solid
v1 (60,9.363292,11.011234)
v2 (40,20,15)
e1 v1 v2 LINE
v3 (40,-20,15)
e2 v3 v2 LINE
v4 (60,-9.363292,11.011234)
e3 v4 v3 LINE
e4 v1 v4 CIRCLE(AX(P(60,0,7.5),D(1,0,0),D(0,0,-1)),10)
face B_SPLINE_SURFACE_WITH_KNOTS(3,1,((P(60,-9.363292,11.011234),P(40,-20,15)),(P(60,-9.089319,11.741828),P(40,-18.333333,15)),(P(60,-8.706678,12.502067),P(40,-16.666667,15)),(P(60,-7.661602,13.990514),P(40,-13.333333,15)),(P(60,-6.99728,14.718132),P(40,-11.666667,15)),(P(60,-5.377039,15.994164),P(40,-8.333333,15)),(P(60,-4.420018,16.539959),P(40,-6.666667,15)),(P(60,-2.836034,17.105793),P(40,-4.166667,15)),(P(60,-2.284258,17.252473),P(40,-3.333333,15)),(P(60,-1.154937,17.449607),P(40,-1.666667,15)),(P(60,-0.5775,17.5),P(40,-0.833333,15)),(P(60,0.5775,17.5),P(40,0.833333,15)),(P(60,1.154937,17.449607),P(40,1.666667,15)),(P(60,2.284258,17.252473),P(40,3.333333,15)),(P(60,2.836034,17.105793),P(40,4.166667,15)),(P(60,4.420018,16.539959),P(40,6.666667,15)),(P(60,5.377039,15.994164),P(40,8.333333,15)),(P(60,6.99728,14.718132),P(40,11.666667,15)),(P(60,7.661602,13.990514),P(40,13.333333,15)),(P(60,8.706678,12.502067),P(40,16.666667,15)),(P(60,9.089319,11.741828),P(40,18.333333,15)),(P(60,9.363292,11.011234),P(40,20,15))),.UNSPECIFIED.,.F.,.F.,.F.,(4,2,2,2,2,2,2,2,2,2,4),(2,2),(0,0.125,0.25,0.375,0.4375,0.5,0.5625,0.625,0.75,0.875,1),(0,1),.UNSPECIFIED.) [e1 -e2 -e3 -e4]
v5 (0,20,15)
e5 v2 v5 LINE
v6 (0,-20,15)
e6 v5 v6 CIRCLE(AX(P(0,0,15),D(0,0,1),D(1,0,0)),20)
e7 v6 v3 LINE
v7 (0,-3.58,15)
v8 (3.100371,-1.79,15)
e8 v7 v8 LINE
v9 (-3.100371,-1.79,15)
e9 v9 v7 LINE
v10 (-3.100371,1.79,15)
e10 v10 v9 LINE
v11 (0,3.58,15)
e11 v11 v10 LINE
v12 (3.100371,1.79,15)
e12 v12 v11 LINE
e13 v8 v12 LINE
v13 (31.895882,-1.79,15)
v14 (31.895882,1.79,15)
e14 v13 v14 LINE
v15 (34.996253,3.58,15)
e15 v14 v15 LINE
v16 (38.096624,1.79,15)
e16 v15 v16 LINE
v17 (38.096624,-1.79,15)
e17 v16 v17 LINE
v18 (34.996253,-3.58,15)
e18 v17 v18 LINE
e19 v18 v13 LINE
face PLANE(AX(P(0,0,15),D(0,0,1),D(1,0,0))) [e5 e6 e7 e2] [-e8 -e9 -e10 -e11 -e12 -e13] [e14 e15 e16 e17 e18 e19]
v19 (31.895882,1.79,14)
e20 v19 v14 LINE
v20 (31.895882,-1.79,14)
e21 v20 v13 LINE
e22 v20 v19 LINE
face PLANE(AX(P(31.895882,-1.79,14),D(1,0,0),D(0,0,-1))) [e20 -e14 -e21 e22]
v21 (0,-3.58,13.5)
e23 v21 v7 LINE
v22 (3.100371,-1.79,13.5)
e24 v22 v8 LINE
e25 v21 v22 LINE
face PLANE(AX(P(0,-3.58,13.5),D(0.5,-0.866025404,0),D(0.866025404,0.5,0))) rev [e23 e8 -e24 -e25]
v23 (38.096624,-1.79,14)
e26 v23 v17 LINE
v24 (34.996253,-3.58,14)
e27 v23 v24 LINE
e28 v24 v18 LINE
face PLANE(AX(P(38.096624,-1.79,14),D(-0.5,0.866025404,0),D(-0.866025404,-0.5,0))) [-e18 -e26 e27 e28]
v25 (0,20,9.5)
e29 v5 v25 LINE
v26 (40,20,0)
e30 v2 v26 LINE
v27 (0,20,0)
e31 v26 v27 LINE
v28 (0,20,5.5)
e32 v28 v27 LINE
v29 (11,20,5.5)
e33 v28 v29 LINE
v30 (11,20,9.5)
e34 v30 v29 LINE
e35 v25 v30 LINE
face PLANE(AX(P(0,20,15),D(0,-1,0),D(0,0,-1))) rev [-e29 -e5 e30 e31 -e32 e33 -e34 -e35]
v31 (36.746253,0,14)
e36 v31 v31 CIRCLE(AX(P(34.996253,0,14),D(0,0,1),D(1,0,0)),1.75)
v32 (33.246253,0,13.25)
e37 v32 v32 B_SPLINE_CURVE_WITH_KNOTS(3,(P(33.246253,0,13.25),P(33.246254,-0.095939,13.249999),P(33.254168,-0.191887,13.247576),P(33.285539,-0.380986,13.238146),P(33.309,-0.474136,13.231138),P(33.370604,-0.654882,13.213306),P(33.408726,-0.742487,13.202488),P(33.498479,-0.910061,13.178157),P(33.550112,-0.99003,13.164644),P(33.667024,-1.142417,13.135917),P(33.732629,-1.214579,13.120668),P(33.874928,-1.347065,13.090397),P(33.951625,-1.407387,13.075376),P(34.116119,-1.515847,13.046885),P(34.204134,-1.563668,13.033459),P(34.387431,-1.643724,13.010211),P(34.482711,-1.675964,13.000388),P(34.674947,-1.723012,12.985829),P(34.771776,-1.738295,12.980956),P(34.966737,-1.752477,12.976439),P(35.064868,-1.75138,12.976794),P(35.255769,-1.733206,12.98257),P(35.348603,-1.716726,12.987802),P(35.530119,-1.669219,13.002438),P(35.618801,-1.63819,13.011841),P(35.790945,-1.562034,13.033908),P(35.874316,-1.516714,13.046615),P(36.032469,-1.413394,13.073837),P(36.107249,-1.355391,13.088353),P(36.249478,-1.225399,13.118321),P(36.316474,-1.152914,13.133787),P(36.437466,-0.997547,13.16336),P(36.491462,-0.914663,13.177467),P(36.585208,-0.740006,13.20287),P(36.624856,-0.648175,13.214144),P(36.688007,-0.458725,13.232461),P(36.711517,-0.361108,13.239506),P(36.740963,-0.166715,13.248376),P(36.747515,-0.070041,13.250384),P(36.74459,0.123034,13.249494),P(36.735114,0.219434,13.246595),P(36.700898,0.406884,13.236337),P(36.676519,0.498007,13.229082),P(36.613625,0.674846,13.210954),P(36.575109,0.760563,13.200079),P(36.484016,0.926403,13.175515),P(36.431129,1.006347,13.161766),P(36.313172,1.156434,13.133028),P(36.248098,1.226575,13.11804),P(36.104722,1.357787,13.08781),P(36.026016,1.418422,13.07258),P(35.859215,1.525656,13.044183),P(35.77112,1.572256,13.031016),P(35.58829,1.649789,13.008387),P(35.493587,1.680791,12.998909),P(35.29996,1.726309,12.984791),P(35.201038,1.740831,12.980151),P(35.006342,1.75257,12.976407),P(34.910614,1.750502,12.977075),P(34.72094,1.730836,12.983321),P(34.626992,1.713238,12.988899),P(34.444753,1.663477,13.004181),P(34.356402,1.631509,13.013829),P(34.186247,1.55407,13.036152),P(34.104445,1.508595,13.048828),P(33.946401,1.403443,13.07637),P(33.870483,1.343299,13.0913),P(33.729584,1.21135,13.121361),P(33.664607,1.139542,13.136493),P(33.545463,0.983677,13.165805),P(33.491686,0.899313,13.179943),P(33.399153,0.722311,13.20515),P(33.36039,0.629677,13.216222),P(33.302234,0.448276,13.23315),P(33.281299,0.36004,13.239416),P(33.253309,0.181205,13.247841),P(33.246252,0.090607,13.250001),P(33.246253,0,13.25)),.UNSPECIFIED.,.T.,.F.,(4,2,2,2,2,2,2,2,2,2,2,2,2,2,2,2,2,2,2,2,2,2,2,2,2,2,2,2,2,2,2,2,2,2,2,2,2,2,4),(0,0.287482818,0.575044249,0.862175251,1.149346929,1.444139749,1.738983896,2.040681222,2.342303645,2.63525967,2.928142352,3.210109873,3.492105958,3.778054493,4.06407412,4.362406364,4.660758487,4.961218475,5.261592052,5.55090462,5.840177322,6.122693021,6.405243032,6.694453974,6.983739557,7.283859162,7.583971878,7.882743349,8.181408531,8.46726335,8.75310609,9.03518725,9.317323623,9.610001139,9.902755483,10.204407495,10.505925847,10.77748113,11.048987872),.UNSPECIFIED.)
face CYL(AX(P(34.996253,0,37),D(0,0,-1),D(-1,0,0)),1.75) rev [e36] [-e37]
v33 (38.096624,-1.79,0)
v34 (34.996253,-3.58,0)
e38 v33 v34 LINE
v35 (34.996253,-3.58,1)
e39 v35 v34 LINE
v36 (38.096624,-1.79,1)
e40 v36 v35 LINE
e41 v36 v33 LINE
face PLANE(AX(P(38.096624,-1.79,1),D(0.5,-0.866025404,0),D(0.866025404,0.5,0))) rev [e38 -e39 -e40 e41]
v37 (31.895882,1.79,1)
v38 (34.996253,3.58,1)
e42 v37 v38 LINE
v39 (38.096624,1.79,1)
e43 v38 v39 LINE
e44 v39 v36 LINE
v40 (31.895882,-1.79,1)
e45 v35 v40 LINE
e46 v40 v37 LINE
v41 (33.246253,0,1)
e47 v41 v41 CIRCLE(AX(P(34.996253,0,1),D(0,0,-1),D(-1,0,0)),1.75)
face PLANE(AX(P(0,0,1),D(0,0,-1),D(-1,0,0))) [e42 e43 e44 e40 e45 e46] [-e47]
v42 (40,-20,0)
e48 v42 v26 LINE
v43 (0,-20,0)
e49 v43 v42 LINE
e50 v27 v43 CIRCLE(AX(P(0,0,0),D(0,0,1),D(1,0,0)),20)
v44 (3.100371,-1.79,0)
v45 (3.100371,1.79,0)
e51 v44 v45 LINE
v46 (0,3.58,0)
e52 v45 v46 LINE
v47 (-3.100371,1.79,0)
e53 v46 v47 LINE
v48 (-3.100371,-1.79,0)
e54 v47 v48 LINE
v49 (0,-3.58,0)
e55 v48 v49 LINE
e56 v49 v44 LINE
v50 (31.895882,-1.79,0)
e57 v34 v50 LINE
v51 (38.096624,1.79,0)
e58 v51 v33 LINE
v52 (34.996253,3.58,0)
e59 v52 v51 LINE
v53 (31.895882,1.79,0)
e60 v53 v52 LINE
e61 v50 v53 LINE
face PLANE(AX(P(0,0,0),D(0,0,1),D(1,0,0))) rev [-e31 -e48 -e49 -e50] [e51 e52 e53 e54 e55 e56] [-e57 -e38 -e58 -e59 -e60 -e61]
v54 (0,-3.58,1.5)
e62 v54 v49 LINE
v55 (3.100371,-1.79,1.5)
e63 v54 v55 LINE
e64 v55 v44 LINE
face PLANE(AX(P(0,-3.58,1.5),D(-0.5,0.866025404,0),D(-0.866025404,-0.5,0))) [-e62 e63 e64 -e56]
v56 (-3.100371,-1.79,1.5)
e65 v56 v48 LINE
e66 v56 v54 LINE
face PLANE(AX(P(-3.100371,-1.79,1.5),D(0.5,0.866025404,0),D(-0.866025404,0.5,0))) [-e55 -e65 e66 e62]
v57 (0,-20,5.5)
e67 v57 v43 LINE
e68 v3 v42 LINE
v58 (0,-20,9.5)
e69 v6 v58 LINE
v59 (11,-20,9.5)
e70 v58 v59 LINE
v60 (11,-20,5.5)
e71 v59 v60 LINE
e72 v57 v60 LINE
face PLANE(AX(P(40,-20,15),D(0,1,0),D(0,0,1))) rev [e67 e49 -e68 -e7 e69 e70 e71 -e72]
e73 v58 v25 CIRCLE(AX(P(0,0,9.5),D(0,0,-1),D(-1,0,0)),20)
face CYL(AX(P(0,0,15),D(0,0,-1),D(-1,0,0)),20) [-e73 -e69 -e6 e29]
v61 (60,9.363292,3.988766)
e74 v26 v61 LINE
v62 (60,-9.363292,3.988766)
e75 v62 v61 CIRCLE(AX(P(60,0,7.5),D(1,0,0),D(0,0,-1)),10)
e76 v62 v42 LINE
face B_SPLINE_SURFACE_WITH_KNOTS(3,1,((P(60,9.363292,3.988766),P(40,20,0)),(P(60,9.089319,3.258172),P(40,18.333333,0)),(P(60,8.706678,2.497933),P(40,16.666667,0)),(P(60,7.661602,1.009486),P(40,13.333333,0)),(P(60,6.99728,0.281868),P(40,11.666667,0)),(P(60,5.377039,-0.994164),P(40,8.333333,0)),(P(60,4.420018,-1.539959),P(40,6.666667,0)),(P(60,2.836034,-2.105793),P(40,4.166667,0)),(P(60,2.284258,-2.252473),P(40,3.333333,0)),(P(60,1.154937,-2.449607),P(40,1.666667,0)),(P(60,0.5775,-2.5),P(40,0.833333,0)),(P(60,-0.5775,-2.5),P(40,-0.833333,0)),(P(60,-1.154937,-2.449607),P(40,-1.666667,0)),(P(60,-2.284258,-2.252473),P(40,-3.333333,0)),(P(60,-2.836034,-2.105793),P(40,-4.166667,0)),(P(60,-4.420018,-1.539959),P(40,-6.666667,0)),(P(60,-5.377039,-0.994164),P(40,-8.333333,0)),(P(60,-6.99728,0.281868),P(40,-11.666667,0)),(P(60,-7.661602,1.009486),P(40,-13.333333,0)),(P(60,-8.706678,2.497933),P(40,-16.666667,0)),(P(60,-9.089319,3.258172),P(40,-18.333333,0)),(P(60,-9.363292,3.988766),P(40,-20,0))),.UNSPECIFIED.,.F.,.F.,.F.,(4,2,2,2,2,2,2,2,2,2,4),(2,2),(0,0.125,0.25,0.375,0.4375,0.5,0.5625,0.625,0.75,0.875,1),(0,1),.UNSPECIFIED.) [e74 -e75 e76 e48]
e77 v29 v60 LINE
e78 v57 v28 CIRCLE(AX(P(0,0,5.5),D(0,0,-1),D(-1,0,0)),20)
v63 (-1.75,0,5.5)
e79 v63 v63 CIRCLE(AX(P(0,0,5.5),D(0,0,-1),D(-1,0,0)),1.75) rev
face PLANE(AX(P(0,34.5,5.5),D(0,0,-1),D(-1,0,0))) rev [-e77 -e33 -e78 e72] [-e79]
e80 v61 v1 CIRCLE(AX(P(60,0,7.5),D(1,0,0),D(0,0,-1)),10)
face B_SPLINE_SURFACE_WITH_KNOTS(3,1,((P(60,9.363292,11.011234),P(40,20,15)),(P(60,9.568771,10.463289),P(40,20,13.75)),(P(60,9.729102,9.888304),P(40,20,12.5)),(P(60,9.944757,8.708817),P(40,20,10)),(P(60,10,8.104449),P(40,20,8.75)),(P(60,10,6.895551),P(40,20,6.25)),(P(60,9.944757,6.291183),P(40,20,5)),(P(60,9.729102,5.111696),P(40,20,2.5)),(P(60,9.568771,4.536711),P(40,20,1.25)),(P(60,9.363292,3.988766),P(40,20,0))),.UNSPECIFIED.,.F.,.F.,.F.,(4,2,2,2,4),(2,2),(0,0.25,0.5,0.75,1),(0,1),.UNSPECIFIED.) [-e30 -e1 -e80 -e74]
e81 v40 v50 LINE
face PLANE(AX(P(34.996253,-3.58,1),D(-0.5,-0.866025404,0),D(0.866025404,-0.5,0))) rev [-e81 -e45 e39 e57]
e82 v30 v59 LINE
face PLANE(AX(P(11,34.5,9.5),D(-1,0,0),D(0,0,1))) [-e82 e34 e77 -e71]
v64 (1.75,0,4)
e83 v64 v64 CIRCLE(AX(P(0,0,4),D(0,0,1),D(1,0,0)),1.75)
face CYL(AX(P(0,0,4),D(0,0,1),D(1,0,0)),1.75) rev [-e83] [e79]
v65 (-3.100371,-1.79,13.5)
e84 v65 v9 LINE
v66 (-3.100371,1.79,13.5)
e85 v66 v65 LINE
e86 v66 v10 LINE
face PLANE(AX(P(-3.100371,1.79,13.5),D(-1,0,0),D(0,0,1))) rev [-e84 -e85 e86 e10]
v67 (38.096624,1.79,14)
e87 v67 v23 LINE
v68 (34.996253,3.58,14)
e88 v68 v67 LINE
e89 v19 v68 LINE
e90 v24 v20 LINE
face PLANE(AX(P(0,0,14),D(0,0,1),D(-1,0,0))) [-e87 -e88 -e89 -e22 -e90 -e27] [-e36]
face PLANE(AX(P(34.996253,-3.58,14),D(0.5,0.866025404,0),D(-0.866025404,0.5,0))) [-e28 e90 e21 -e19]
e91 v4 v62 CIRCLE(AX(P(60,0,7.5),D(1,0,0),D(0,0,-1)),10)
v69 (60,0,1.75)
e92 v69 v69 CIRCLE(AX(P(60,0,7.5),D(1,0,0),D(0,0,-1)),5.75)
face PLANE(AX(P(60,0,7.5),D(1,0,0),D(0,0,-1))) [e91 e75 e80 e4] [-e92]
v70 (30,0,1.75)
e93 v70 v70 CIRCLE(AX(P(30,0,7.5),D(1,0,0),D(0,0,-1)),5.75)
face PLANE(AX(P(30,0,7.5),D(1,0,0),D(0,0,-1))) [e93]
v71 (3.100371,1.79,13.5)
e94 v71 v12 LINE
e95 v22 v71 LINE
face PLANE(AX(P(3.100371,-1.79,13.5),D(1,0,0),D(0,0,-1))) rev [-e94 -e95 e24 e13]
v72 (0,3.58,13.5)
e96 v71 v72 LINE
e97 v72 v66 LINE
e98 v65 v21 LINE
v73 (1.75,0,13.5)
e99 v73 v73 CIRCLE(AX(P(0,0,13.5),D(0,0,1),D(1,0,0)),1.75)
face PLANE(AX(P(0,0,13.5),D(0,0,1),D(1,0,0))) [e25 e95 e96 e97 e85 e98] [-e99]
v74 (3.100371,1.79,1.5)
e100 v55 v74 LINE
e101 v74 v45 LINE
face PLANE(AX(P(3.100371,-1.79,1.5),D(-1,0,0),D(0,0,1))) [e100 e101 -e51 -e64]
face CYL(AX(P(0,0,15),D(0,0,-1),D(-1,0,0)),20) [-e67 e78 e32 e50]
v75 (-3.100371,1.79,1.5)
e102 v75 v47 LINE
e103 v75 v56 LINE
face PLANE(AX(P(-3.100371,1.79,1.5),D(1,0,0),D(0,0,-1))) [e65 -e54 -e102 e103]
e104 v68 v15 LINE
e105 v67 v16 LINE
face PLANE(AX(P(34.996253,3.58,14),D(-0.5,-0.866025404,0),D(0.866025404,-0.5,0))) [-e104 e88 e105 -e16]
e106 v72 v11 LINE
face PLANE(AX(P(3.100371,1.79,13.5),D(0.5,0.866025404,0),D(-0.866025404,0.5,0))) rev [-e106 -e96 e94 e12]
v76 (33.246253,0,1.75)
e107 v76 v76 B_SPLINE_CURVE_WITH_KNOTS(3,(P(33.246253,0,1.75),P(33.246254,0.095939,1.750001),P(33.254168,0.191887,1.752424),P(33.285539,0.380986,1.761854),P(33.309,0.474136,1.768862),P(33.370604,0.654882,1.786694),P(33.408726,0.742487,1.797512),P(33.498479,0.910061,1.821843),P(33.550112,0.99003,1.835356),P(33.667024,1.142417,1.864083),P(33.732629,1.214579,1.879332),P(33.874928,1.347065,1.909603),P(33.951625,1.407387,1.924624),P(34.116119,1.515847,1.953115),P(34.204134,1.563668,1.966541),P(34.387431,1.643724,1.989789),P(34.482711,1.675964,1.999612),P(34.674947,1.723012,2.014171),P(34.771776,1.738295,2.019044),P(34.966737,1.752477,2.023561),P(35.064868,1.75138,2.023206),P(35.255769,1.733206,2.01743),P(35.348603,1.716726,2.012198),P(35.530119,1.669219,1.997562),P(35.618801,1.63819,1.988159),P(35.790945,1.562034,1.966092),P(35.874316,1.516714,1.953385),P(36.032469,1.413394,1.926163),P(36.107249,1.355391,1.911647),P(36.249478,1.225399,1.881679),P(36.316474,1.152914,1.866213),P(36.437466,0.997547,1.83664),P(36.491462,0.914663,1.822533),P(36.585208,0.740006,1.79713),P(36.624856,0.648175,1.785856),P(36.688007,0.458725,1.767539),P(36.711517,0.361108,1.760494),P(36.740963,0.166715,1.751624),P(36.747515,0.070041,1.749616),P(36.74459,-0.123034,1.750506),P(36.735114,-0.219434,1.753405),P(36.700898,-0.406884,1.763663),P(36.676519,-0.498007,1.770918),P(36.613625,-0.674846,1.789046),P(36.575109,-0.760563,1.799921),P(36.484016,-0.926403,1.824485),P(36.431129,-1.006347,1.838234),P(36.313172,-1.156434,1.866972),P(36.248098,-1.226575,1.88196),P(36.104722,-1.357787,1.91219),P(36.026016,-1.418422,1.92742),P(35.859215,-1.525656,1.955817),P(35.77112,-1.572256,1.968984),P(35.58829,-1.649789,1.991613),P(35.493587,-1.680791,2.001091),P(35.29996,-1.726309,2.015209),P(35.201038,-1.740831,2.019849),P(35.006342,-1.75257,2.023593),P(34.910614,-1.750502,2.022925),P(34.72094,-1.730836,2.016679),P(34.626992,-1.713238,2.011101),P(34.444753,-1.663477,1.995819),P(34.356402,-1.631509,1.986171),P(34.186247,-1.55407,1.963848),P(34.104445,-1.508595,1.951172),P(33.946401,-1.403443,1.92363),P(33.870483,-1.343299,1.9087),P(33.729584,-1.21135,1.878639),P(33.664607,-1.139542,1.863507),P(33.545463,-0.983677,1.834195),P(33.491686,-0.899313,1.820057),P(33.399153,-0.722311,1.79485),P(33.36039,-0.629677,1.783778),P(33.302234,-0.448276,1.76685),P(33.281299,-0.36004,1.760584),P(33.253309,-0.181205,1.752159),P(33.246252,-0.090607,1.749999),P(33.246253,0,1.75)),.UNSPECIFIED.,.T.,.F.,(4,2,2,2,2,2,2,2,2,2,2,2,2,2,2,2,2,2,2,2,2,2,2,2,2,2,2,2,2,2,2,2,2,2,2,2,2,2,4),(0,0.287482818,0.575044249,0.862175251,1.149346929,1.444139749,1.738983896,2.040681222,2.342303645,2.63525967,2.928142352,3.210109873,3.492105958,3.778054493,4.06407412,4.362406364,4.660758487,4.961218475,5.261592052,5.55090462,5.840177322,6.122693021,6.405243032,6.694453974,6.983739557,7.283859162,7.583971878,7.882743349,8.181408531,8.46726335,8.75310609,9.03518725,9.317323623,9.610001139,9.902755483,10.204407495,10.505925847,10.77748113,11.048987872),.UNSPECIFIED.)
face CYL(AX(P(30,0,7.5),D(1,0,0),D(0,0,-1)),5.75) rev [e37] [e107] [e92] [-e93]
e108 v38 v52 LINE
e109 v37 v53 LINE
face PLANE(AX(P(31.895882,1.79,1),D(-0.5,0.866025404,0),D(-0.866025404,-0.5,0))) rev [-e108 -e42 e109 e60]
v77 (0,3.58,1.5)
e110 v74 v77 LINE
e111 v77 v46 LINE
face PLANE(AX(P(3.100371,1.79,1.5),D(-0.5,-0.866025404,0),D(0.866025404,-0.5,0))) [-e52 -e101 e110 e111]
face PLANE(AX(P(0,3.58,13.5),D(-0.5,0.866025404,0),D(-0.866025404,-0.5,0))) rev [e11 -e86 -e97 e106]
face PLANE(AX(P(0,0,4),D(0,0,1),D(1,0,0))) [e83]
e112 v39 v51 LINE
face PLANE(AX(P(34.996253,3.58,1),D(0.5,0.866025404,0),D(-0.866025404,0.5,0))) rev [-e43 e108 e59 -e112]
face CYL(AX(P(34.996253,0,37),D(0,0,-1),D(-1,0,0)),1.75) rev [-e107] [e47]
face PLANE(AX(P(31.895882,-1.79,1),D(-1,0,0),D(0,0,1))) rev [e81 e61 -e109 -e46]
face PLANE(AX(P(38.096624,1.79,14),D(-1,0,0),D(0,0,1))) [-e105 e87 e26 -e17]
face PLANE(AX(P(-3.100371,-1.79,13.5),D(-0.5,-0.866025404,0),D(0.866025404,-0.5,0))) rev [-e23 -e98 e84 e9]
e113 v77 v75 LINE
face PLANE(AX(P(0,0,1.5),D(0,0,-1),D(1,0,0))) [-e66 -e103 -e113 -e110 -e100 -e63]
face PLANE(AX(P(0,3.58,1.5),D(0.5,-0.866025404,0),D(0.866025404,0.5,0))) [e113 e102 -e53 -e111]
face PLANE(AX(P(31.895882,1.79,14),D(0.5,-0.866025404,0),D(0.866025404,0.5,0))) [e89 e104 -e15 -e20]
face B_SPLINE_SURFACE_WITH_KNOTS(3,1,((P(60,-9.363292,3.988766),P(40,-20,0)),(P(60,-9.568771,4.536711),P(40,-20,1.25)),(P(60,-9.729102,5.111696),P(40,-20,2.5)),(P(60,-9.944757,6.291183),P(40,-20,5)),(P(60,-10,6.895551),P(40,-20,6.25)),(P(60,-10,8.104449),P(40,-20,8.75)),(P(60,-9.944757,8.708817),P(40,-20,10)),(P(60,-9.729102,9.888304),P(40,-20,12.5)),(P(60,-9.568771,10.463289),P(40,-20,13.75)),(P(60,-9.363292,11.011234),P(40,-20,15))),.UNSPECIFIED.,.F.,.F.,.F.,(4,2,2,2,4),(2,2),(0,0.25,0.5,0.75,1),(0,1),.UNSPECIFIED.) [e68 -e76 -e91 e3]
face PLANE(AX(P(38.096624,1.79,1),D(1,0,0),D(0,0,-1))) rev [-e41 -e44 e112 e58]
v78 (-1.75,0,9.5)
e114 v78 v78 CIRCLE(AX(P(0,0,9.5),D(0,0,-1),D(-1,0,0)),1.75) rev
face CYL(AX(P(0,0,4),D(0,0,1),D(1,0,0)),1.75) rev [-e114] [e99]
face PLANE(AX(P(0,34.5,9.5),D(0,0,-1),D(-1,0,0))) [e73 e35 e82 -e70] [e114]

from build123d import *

# Parameters (mm, degrees)
BOSS_EXTRUDE1_DEPTH = 15
CUT_EXTRUDE1_DEPTH  = 1.5
SKETCH3_R           = 1.75
CUT_EXTRUDE2_DEPTH  = 9.5
SKETCH5_W           = 31
SKETCH5_H           = 4
CUT_EXTRUDE3_DEPTH  = 54.5
SKETCH9_R           = 5.75
CUT_EXTRUDE6_DEPTH  = 30
CUT_EXTRUDE7_DEPTH  = 1
CUT_EXTRUDE8_DEPTH  = 36


with BuildPart() as part:
    # Sketch1 → Boss-Extrude1 (new body)
    with BuildSketch(Plane.XY):
        with BuildLine():
            Line((0, 20), (40, 20))
            Line((40, 20), (40, -20))
            Line((40, -20), (0, -20))
            ThreePointArc((0, -20), (-20, 0), (0, 20))
        make_face()
    extrude(amount=BOSS_EXTRUDE1_DEPTH)

    # Sketch2 → Cut-Extrude1 (cut)
    with BuildSketch(Plane.XY.offset(15)):
        Polygon((0, 3.58), (-3.100370946, 1.79), (-3.100370946, -1.79), (0, -3.58), (3.100370946, -1.79), (3.100370946, 1.79), align=None)
    cut_extrude1 = extrude(amount=-CUT_EXTRUDE1_DEPTH, mode=Mode.SUBTRACT)

    # Mirror1: Cut-Extrude1 across plane
    add(cut_extrude1.mirror(Plane.XY.offset(7.5)), mode=Mode.SUBTRACT)

    # Sketch3 → Cut-Extrude2 (cut)
    with BuildSketch(Plane.XY.offset(13.5)):
        Circle(SKETCH3_R)
    extrude(amount=-CUT_EXTRUDE2_DEPTH, mode=Mode.SUBTRACT)

    # Sketch5 → Cut-Extrude3 (cut)
    with BuildSketch(Plane.XZ.offset(20)):
        with Locations((-4.5, 7.5)):
            Rectangle(SKETCH5_W, SKETCH5_H)
    extrude(amount=-CUT_EXTRUDE3_DEPTH, mode=Mode.SUBTRACT)

    # Loft2: read off the stored shape, not the designer's step
    # Loft2: loft between two sections, ruled curve by curve
    loft2_from = [
        Edge.make_bspline([(60, 9.363291776, 3.988765584), (60, 9.089319173, 3.258171977), (60, 8.706678231, 2.497933469), (60, 7.661601681, 1.009485762), (60, 6.997280046, 0.281867871), (60, 5.377038752, -0.99416351), (60, 4.420018042, -1.539958552), (60, 2.836034453, -2.105793102), (60, 2.284258254, -2.252472584), (60, 1.154936709, -2.449606951), (60, 0.57750039, -2.5), (60, -0.57750039, -2.5), (60, -1.154936709, -2.449606951), (60, -2.284258254, -2.252472584), (60, -2.836034453, -2.105793102), (60, -4.420018042, -1.539958552), (60, -5.377038752, -0.99416351), (60, -6.997280046, 0.281867871), (60, -7.661601681, 1.009485762), (60, -8.706678231, 2.497933469), (60, -9.089319173, 3.258171977), (60, -9.363291776, 3.988765584)], [0, 0, 0, 0, 0.125, 0.125, 0.25, 0.25, 0.375, 0.375, 0.4375, 0.4375, 0.5, 0.5, 0.5625, 0.5625, 0.625, 0.625, 0.75, 0.75, 0.875, 0.875, 1, 1, 1, 1], 3),
        Edge.make_bspline([(60, -9.363291776, 3.988765584), (60, -9.568771228, 4.53671079), (60, -9.729102032, 5.111695552), (60, -9.944756725, 6.291183156), (60, -10, 6.895551394), (60, -10, 8.104448606), (60, -9.944756725, 8.708816844), (60, -9.729102032, 9.888304448), (60, -9.568771228, 10.46328921), (60, -9.363291776, 11.011234416)], [0, 0, 0, 0, 0.25, 0.25, 0.5, 0.5, 0.75, 0.75, 1, 1, 1, 1], 3),
        Edge.make_bspline([(60, 9.363291776, 11.011234416), (60, 9.568771228, 10.46328921), (60, 9.729102032, 9.888304448), (60, 9.944756725, 8.708816844), (60, 10, 8.104448606), (60, 10, 6.895551394), (60, 9.944756725, 6.291183156), (60, 9.729102032, 5.111695552), (60, 9.568771228, 4.53671079), (60, 9.363291776, 3.988765584)], [0, 0, 0, 0, 0.25, 0.25, 0.5, 0.5, 0.75, 0.75, 1, 1, 1, 1], 3),
        Edge.make_bspline([(60, -9.363291776, 11.011234416), (60, -9.089319173, 11.741828023), (60, -8.706678231, 12.502066531), (60, -7.661601681, 13.990514238), (60, -6.997280046, 14.718132129), (60, -5.377038752, 15.99416351), (60, -4.420018042, 16.539958552), (60, -2.836034453, 17.105793102), (60, -2.284258254, 17.252472584), (60, -1.154936709, 17.449606951), (60, -0.57750039, 17.5), (60, 0.57750039, 17.5), (60, 1.154936709, 17.449606951), (60, 2.284258254, 17.252472584), (60, 2.836034453, 17.105793102), (60, 4.420018042, 16.539958552), (60, 5.377038752, 15.99416351), (60, 6.997280046, 14.718132129), (60, 7.661601681, 13.990514238), (60, 8.706678231, 12.502066531), (60, 9.089319173, 11.741828023), (60, 9.363291776, 11.011234416)], [0, 0, 0, 0, 0.125, 0.125, 0.25, 0.25, 0.375, 0.375, 0.4375, 0.4375, 0.5, 0.5, 0.5625, 0.5625, 0.625, 0.625, 0.75, 0.75, 0.875, 0.875, 1, 1, 1, 1], 3),
    ]
    loft2_to = [
        Edge.make_bspline([(40, 20, 0), (40, 18.333333333, 0), (40, 16.666666667, 0), (40, 13.333333333, 0), (40, 11.666666667, 0), (40, 8.333333333, 0), (40, 6.666666667, 0), (40, 4.166666667, 0), (40, 3.333333333, 0), (40, 1.666666667, 0), (40, 0.833333333, 0), (40, -0.833333333, 0), (40, -1.666666667, 0), (40, -3.333333333, 0), (40, -4.166666667, 0), (40, -6.666666667, 0), (40, -8.333333333, 0), (40, -11.666666667, 0), (40, -13.333333333, 0), (40, -16.666666667, 0), (40, -18.333333333, 0), (40, -20, 0)], [0, 0, 0, 0, 0.125, 0.125, 0.25, 0.25, 0.375, 0.375, 0.4375, 0.4375, 0.5, 0.5, 0.5625, 0.5625, 0.625, 0.625, 0.75, 0.75, 0.875, 0.875, 1, 1, 1, 1], 3),
        Edge.make_bspline([(40, -20, 0), (40, -20, 1.25), (40, -20, 2.5), (40, -20, 5), (40, -20, 6.25), (40, -20, 8.75), (40, -20, 10), (40, -20, 12.5), (40, -20, 13.75), (40, -20, 15)], [0, 0, 0, 0, 0.25, 0.25, 0.5, 0.5, 0.75, 0.75, 1, 1, 1, 1], 3),
        Edge.make_bspline([(40, 20, 15), (40, 20, 13.75), (40, 20, 12.5), (40, 20, 10), (40, 20, 8.75), (40, 20, 6.25), (40, 20, 5), (40, 20, 2.5), (40, 20, 1.25), (40, 20, 0)], [0, 0, 0, 0, 0.25, 0.25, 0.5, 0.5, 0.75, 0.75, 1, 1, 1, 1], 3),
        Edge.make_bspline([(40, -20, 15), (40, -18.333333333, 15), (40, -16.666666667, 15), (40, -13.333333333, 15), (40, -11.666666667, 15), (40, -8.333333333, 15), (40, -6.666666667, 15), (40, -4.166666667, 15), (40, -3.333333333, 15), (40, -1.666666667, 15), (40, -0.833333333, 15), (40, 0.833333333, 15), (40, 1.666666667, 15), (40, 3.333333333, 15), (40, 4.166666667, 15), (40, 6.666666667, 15), (40, 8.333333333, 15), (40, 11.666666667, 15), (40, 13.333333333, 15), (40, 16.666666667, 15), (40, 18.333333333, 15), (40, 20, 15)], [0, 0, 0, 0, 0.125, 0.125, 0.25, 0.25, 0.375, 0.375, 0.4375, 0.4375, 0.5, 0.5, 0.5625, 0.5625, 0.625, 0.625, 0.75, 0.75, 0.875, 0.875, 1, 1, 1, 1], 3),
    ]
    loft2 = Solid(Shell([*[Face.make_surface_from_curves(loft2_from[k], loft2_to[k]) for k in range(4)], Face(Wire(loft2_from)), Face(Wire(loft2_to))]))
    add(loft2)

    # Sketch9 → Cut-Extrude6 (cut)
    with BuildSketch(Plane(origin=(60, 0, 0), x_dir=(0, 0, -1), z_dir=(1, 0, 0))):
        with Locations((-7.5, 0)):
            Circle(SKETCH9_R)
    extrude(amount=-CUT_EXTRUDE6_DEPTH, mode=Mode.SUBTRACT)

    # Sketch10 → Cut-Extrude7 (cut)
    with BuildSketch(Plane(origin=(0, 0, 0), x_dir=(-1, 0, 0), z_dir=(0, 0, -1))):
        Polygon((-34.996252953, 3.58), (-38.096623899, 1.79), (-38.096623899, -1.79), (-34.996252953, -3.58), (-31.895882008, -1.79), (-31.895882008, 1.79), align=None)
    cut_extrude7 = extrude(amount=-CUT_EXTRUDE7_DEPTH, mode=Mode.SUBTRACT)

    # Mirror4: Cut-Extrude7 across plane
    add(cut_extrude7.mirror(Plane.XY.offset(7.5)), mode=Mode.SUBTRACT)

    # Sketch11 → Cut-Extrude8 (cut)
    with BuildSketch(Plane(origin=(0, 0, 1), x_dir=(-1, 0, 0), z_dir=(0, 0, -1))):
        with BuildLine():
            ThreePointArc((-33.246252953, 0), (-33.758816086, 1.237436867), (-34.996252953, 1.75))
            Line((-34.996252953, 1.75), (-34.996252953, -1.75))
            ThreePointArc((-34.996252953, -1.75), (-33.758816086, -1.237436867), (-33.246252953, 0))
        make_face()
        with BuildLine():
            Line((-34.996252953, -1.75), (-34.996252953, 1.75))
            ThreePointArc((-34.996252953, 1.75), (-36.746252953, 0), (-34.996252953, -1.75))
        make_face()
    extrude(amount=-CUT_EXTRUDE8_DEPTH, mode=Mode.SUBTRACT)


solid = part.part
